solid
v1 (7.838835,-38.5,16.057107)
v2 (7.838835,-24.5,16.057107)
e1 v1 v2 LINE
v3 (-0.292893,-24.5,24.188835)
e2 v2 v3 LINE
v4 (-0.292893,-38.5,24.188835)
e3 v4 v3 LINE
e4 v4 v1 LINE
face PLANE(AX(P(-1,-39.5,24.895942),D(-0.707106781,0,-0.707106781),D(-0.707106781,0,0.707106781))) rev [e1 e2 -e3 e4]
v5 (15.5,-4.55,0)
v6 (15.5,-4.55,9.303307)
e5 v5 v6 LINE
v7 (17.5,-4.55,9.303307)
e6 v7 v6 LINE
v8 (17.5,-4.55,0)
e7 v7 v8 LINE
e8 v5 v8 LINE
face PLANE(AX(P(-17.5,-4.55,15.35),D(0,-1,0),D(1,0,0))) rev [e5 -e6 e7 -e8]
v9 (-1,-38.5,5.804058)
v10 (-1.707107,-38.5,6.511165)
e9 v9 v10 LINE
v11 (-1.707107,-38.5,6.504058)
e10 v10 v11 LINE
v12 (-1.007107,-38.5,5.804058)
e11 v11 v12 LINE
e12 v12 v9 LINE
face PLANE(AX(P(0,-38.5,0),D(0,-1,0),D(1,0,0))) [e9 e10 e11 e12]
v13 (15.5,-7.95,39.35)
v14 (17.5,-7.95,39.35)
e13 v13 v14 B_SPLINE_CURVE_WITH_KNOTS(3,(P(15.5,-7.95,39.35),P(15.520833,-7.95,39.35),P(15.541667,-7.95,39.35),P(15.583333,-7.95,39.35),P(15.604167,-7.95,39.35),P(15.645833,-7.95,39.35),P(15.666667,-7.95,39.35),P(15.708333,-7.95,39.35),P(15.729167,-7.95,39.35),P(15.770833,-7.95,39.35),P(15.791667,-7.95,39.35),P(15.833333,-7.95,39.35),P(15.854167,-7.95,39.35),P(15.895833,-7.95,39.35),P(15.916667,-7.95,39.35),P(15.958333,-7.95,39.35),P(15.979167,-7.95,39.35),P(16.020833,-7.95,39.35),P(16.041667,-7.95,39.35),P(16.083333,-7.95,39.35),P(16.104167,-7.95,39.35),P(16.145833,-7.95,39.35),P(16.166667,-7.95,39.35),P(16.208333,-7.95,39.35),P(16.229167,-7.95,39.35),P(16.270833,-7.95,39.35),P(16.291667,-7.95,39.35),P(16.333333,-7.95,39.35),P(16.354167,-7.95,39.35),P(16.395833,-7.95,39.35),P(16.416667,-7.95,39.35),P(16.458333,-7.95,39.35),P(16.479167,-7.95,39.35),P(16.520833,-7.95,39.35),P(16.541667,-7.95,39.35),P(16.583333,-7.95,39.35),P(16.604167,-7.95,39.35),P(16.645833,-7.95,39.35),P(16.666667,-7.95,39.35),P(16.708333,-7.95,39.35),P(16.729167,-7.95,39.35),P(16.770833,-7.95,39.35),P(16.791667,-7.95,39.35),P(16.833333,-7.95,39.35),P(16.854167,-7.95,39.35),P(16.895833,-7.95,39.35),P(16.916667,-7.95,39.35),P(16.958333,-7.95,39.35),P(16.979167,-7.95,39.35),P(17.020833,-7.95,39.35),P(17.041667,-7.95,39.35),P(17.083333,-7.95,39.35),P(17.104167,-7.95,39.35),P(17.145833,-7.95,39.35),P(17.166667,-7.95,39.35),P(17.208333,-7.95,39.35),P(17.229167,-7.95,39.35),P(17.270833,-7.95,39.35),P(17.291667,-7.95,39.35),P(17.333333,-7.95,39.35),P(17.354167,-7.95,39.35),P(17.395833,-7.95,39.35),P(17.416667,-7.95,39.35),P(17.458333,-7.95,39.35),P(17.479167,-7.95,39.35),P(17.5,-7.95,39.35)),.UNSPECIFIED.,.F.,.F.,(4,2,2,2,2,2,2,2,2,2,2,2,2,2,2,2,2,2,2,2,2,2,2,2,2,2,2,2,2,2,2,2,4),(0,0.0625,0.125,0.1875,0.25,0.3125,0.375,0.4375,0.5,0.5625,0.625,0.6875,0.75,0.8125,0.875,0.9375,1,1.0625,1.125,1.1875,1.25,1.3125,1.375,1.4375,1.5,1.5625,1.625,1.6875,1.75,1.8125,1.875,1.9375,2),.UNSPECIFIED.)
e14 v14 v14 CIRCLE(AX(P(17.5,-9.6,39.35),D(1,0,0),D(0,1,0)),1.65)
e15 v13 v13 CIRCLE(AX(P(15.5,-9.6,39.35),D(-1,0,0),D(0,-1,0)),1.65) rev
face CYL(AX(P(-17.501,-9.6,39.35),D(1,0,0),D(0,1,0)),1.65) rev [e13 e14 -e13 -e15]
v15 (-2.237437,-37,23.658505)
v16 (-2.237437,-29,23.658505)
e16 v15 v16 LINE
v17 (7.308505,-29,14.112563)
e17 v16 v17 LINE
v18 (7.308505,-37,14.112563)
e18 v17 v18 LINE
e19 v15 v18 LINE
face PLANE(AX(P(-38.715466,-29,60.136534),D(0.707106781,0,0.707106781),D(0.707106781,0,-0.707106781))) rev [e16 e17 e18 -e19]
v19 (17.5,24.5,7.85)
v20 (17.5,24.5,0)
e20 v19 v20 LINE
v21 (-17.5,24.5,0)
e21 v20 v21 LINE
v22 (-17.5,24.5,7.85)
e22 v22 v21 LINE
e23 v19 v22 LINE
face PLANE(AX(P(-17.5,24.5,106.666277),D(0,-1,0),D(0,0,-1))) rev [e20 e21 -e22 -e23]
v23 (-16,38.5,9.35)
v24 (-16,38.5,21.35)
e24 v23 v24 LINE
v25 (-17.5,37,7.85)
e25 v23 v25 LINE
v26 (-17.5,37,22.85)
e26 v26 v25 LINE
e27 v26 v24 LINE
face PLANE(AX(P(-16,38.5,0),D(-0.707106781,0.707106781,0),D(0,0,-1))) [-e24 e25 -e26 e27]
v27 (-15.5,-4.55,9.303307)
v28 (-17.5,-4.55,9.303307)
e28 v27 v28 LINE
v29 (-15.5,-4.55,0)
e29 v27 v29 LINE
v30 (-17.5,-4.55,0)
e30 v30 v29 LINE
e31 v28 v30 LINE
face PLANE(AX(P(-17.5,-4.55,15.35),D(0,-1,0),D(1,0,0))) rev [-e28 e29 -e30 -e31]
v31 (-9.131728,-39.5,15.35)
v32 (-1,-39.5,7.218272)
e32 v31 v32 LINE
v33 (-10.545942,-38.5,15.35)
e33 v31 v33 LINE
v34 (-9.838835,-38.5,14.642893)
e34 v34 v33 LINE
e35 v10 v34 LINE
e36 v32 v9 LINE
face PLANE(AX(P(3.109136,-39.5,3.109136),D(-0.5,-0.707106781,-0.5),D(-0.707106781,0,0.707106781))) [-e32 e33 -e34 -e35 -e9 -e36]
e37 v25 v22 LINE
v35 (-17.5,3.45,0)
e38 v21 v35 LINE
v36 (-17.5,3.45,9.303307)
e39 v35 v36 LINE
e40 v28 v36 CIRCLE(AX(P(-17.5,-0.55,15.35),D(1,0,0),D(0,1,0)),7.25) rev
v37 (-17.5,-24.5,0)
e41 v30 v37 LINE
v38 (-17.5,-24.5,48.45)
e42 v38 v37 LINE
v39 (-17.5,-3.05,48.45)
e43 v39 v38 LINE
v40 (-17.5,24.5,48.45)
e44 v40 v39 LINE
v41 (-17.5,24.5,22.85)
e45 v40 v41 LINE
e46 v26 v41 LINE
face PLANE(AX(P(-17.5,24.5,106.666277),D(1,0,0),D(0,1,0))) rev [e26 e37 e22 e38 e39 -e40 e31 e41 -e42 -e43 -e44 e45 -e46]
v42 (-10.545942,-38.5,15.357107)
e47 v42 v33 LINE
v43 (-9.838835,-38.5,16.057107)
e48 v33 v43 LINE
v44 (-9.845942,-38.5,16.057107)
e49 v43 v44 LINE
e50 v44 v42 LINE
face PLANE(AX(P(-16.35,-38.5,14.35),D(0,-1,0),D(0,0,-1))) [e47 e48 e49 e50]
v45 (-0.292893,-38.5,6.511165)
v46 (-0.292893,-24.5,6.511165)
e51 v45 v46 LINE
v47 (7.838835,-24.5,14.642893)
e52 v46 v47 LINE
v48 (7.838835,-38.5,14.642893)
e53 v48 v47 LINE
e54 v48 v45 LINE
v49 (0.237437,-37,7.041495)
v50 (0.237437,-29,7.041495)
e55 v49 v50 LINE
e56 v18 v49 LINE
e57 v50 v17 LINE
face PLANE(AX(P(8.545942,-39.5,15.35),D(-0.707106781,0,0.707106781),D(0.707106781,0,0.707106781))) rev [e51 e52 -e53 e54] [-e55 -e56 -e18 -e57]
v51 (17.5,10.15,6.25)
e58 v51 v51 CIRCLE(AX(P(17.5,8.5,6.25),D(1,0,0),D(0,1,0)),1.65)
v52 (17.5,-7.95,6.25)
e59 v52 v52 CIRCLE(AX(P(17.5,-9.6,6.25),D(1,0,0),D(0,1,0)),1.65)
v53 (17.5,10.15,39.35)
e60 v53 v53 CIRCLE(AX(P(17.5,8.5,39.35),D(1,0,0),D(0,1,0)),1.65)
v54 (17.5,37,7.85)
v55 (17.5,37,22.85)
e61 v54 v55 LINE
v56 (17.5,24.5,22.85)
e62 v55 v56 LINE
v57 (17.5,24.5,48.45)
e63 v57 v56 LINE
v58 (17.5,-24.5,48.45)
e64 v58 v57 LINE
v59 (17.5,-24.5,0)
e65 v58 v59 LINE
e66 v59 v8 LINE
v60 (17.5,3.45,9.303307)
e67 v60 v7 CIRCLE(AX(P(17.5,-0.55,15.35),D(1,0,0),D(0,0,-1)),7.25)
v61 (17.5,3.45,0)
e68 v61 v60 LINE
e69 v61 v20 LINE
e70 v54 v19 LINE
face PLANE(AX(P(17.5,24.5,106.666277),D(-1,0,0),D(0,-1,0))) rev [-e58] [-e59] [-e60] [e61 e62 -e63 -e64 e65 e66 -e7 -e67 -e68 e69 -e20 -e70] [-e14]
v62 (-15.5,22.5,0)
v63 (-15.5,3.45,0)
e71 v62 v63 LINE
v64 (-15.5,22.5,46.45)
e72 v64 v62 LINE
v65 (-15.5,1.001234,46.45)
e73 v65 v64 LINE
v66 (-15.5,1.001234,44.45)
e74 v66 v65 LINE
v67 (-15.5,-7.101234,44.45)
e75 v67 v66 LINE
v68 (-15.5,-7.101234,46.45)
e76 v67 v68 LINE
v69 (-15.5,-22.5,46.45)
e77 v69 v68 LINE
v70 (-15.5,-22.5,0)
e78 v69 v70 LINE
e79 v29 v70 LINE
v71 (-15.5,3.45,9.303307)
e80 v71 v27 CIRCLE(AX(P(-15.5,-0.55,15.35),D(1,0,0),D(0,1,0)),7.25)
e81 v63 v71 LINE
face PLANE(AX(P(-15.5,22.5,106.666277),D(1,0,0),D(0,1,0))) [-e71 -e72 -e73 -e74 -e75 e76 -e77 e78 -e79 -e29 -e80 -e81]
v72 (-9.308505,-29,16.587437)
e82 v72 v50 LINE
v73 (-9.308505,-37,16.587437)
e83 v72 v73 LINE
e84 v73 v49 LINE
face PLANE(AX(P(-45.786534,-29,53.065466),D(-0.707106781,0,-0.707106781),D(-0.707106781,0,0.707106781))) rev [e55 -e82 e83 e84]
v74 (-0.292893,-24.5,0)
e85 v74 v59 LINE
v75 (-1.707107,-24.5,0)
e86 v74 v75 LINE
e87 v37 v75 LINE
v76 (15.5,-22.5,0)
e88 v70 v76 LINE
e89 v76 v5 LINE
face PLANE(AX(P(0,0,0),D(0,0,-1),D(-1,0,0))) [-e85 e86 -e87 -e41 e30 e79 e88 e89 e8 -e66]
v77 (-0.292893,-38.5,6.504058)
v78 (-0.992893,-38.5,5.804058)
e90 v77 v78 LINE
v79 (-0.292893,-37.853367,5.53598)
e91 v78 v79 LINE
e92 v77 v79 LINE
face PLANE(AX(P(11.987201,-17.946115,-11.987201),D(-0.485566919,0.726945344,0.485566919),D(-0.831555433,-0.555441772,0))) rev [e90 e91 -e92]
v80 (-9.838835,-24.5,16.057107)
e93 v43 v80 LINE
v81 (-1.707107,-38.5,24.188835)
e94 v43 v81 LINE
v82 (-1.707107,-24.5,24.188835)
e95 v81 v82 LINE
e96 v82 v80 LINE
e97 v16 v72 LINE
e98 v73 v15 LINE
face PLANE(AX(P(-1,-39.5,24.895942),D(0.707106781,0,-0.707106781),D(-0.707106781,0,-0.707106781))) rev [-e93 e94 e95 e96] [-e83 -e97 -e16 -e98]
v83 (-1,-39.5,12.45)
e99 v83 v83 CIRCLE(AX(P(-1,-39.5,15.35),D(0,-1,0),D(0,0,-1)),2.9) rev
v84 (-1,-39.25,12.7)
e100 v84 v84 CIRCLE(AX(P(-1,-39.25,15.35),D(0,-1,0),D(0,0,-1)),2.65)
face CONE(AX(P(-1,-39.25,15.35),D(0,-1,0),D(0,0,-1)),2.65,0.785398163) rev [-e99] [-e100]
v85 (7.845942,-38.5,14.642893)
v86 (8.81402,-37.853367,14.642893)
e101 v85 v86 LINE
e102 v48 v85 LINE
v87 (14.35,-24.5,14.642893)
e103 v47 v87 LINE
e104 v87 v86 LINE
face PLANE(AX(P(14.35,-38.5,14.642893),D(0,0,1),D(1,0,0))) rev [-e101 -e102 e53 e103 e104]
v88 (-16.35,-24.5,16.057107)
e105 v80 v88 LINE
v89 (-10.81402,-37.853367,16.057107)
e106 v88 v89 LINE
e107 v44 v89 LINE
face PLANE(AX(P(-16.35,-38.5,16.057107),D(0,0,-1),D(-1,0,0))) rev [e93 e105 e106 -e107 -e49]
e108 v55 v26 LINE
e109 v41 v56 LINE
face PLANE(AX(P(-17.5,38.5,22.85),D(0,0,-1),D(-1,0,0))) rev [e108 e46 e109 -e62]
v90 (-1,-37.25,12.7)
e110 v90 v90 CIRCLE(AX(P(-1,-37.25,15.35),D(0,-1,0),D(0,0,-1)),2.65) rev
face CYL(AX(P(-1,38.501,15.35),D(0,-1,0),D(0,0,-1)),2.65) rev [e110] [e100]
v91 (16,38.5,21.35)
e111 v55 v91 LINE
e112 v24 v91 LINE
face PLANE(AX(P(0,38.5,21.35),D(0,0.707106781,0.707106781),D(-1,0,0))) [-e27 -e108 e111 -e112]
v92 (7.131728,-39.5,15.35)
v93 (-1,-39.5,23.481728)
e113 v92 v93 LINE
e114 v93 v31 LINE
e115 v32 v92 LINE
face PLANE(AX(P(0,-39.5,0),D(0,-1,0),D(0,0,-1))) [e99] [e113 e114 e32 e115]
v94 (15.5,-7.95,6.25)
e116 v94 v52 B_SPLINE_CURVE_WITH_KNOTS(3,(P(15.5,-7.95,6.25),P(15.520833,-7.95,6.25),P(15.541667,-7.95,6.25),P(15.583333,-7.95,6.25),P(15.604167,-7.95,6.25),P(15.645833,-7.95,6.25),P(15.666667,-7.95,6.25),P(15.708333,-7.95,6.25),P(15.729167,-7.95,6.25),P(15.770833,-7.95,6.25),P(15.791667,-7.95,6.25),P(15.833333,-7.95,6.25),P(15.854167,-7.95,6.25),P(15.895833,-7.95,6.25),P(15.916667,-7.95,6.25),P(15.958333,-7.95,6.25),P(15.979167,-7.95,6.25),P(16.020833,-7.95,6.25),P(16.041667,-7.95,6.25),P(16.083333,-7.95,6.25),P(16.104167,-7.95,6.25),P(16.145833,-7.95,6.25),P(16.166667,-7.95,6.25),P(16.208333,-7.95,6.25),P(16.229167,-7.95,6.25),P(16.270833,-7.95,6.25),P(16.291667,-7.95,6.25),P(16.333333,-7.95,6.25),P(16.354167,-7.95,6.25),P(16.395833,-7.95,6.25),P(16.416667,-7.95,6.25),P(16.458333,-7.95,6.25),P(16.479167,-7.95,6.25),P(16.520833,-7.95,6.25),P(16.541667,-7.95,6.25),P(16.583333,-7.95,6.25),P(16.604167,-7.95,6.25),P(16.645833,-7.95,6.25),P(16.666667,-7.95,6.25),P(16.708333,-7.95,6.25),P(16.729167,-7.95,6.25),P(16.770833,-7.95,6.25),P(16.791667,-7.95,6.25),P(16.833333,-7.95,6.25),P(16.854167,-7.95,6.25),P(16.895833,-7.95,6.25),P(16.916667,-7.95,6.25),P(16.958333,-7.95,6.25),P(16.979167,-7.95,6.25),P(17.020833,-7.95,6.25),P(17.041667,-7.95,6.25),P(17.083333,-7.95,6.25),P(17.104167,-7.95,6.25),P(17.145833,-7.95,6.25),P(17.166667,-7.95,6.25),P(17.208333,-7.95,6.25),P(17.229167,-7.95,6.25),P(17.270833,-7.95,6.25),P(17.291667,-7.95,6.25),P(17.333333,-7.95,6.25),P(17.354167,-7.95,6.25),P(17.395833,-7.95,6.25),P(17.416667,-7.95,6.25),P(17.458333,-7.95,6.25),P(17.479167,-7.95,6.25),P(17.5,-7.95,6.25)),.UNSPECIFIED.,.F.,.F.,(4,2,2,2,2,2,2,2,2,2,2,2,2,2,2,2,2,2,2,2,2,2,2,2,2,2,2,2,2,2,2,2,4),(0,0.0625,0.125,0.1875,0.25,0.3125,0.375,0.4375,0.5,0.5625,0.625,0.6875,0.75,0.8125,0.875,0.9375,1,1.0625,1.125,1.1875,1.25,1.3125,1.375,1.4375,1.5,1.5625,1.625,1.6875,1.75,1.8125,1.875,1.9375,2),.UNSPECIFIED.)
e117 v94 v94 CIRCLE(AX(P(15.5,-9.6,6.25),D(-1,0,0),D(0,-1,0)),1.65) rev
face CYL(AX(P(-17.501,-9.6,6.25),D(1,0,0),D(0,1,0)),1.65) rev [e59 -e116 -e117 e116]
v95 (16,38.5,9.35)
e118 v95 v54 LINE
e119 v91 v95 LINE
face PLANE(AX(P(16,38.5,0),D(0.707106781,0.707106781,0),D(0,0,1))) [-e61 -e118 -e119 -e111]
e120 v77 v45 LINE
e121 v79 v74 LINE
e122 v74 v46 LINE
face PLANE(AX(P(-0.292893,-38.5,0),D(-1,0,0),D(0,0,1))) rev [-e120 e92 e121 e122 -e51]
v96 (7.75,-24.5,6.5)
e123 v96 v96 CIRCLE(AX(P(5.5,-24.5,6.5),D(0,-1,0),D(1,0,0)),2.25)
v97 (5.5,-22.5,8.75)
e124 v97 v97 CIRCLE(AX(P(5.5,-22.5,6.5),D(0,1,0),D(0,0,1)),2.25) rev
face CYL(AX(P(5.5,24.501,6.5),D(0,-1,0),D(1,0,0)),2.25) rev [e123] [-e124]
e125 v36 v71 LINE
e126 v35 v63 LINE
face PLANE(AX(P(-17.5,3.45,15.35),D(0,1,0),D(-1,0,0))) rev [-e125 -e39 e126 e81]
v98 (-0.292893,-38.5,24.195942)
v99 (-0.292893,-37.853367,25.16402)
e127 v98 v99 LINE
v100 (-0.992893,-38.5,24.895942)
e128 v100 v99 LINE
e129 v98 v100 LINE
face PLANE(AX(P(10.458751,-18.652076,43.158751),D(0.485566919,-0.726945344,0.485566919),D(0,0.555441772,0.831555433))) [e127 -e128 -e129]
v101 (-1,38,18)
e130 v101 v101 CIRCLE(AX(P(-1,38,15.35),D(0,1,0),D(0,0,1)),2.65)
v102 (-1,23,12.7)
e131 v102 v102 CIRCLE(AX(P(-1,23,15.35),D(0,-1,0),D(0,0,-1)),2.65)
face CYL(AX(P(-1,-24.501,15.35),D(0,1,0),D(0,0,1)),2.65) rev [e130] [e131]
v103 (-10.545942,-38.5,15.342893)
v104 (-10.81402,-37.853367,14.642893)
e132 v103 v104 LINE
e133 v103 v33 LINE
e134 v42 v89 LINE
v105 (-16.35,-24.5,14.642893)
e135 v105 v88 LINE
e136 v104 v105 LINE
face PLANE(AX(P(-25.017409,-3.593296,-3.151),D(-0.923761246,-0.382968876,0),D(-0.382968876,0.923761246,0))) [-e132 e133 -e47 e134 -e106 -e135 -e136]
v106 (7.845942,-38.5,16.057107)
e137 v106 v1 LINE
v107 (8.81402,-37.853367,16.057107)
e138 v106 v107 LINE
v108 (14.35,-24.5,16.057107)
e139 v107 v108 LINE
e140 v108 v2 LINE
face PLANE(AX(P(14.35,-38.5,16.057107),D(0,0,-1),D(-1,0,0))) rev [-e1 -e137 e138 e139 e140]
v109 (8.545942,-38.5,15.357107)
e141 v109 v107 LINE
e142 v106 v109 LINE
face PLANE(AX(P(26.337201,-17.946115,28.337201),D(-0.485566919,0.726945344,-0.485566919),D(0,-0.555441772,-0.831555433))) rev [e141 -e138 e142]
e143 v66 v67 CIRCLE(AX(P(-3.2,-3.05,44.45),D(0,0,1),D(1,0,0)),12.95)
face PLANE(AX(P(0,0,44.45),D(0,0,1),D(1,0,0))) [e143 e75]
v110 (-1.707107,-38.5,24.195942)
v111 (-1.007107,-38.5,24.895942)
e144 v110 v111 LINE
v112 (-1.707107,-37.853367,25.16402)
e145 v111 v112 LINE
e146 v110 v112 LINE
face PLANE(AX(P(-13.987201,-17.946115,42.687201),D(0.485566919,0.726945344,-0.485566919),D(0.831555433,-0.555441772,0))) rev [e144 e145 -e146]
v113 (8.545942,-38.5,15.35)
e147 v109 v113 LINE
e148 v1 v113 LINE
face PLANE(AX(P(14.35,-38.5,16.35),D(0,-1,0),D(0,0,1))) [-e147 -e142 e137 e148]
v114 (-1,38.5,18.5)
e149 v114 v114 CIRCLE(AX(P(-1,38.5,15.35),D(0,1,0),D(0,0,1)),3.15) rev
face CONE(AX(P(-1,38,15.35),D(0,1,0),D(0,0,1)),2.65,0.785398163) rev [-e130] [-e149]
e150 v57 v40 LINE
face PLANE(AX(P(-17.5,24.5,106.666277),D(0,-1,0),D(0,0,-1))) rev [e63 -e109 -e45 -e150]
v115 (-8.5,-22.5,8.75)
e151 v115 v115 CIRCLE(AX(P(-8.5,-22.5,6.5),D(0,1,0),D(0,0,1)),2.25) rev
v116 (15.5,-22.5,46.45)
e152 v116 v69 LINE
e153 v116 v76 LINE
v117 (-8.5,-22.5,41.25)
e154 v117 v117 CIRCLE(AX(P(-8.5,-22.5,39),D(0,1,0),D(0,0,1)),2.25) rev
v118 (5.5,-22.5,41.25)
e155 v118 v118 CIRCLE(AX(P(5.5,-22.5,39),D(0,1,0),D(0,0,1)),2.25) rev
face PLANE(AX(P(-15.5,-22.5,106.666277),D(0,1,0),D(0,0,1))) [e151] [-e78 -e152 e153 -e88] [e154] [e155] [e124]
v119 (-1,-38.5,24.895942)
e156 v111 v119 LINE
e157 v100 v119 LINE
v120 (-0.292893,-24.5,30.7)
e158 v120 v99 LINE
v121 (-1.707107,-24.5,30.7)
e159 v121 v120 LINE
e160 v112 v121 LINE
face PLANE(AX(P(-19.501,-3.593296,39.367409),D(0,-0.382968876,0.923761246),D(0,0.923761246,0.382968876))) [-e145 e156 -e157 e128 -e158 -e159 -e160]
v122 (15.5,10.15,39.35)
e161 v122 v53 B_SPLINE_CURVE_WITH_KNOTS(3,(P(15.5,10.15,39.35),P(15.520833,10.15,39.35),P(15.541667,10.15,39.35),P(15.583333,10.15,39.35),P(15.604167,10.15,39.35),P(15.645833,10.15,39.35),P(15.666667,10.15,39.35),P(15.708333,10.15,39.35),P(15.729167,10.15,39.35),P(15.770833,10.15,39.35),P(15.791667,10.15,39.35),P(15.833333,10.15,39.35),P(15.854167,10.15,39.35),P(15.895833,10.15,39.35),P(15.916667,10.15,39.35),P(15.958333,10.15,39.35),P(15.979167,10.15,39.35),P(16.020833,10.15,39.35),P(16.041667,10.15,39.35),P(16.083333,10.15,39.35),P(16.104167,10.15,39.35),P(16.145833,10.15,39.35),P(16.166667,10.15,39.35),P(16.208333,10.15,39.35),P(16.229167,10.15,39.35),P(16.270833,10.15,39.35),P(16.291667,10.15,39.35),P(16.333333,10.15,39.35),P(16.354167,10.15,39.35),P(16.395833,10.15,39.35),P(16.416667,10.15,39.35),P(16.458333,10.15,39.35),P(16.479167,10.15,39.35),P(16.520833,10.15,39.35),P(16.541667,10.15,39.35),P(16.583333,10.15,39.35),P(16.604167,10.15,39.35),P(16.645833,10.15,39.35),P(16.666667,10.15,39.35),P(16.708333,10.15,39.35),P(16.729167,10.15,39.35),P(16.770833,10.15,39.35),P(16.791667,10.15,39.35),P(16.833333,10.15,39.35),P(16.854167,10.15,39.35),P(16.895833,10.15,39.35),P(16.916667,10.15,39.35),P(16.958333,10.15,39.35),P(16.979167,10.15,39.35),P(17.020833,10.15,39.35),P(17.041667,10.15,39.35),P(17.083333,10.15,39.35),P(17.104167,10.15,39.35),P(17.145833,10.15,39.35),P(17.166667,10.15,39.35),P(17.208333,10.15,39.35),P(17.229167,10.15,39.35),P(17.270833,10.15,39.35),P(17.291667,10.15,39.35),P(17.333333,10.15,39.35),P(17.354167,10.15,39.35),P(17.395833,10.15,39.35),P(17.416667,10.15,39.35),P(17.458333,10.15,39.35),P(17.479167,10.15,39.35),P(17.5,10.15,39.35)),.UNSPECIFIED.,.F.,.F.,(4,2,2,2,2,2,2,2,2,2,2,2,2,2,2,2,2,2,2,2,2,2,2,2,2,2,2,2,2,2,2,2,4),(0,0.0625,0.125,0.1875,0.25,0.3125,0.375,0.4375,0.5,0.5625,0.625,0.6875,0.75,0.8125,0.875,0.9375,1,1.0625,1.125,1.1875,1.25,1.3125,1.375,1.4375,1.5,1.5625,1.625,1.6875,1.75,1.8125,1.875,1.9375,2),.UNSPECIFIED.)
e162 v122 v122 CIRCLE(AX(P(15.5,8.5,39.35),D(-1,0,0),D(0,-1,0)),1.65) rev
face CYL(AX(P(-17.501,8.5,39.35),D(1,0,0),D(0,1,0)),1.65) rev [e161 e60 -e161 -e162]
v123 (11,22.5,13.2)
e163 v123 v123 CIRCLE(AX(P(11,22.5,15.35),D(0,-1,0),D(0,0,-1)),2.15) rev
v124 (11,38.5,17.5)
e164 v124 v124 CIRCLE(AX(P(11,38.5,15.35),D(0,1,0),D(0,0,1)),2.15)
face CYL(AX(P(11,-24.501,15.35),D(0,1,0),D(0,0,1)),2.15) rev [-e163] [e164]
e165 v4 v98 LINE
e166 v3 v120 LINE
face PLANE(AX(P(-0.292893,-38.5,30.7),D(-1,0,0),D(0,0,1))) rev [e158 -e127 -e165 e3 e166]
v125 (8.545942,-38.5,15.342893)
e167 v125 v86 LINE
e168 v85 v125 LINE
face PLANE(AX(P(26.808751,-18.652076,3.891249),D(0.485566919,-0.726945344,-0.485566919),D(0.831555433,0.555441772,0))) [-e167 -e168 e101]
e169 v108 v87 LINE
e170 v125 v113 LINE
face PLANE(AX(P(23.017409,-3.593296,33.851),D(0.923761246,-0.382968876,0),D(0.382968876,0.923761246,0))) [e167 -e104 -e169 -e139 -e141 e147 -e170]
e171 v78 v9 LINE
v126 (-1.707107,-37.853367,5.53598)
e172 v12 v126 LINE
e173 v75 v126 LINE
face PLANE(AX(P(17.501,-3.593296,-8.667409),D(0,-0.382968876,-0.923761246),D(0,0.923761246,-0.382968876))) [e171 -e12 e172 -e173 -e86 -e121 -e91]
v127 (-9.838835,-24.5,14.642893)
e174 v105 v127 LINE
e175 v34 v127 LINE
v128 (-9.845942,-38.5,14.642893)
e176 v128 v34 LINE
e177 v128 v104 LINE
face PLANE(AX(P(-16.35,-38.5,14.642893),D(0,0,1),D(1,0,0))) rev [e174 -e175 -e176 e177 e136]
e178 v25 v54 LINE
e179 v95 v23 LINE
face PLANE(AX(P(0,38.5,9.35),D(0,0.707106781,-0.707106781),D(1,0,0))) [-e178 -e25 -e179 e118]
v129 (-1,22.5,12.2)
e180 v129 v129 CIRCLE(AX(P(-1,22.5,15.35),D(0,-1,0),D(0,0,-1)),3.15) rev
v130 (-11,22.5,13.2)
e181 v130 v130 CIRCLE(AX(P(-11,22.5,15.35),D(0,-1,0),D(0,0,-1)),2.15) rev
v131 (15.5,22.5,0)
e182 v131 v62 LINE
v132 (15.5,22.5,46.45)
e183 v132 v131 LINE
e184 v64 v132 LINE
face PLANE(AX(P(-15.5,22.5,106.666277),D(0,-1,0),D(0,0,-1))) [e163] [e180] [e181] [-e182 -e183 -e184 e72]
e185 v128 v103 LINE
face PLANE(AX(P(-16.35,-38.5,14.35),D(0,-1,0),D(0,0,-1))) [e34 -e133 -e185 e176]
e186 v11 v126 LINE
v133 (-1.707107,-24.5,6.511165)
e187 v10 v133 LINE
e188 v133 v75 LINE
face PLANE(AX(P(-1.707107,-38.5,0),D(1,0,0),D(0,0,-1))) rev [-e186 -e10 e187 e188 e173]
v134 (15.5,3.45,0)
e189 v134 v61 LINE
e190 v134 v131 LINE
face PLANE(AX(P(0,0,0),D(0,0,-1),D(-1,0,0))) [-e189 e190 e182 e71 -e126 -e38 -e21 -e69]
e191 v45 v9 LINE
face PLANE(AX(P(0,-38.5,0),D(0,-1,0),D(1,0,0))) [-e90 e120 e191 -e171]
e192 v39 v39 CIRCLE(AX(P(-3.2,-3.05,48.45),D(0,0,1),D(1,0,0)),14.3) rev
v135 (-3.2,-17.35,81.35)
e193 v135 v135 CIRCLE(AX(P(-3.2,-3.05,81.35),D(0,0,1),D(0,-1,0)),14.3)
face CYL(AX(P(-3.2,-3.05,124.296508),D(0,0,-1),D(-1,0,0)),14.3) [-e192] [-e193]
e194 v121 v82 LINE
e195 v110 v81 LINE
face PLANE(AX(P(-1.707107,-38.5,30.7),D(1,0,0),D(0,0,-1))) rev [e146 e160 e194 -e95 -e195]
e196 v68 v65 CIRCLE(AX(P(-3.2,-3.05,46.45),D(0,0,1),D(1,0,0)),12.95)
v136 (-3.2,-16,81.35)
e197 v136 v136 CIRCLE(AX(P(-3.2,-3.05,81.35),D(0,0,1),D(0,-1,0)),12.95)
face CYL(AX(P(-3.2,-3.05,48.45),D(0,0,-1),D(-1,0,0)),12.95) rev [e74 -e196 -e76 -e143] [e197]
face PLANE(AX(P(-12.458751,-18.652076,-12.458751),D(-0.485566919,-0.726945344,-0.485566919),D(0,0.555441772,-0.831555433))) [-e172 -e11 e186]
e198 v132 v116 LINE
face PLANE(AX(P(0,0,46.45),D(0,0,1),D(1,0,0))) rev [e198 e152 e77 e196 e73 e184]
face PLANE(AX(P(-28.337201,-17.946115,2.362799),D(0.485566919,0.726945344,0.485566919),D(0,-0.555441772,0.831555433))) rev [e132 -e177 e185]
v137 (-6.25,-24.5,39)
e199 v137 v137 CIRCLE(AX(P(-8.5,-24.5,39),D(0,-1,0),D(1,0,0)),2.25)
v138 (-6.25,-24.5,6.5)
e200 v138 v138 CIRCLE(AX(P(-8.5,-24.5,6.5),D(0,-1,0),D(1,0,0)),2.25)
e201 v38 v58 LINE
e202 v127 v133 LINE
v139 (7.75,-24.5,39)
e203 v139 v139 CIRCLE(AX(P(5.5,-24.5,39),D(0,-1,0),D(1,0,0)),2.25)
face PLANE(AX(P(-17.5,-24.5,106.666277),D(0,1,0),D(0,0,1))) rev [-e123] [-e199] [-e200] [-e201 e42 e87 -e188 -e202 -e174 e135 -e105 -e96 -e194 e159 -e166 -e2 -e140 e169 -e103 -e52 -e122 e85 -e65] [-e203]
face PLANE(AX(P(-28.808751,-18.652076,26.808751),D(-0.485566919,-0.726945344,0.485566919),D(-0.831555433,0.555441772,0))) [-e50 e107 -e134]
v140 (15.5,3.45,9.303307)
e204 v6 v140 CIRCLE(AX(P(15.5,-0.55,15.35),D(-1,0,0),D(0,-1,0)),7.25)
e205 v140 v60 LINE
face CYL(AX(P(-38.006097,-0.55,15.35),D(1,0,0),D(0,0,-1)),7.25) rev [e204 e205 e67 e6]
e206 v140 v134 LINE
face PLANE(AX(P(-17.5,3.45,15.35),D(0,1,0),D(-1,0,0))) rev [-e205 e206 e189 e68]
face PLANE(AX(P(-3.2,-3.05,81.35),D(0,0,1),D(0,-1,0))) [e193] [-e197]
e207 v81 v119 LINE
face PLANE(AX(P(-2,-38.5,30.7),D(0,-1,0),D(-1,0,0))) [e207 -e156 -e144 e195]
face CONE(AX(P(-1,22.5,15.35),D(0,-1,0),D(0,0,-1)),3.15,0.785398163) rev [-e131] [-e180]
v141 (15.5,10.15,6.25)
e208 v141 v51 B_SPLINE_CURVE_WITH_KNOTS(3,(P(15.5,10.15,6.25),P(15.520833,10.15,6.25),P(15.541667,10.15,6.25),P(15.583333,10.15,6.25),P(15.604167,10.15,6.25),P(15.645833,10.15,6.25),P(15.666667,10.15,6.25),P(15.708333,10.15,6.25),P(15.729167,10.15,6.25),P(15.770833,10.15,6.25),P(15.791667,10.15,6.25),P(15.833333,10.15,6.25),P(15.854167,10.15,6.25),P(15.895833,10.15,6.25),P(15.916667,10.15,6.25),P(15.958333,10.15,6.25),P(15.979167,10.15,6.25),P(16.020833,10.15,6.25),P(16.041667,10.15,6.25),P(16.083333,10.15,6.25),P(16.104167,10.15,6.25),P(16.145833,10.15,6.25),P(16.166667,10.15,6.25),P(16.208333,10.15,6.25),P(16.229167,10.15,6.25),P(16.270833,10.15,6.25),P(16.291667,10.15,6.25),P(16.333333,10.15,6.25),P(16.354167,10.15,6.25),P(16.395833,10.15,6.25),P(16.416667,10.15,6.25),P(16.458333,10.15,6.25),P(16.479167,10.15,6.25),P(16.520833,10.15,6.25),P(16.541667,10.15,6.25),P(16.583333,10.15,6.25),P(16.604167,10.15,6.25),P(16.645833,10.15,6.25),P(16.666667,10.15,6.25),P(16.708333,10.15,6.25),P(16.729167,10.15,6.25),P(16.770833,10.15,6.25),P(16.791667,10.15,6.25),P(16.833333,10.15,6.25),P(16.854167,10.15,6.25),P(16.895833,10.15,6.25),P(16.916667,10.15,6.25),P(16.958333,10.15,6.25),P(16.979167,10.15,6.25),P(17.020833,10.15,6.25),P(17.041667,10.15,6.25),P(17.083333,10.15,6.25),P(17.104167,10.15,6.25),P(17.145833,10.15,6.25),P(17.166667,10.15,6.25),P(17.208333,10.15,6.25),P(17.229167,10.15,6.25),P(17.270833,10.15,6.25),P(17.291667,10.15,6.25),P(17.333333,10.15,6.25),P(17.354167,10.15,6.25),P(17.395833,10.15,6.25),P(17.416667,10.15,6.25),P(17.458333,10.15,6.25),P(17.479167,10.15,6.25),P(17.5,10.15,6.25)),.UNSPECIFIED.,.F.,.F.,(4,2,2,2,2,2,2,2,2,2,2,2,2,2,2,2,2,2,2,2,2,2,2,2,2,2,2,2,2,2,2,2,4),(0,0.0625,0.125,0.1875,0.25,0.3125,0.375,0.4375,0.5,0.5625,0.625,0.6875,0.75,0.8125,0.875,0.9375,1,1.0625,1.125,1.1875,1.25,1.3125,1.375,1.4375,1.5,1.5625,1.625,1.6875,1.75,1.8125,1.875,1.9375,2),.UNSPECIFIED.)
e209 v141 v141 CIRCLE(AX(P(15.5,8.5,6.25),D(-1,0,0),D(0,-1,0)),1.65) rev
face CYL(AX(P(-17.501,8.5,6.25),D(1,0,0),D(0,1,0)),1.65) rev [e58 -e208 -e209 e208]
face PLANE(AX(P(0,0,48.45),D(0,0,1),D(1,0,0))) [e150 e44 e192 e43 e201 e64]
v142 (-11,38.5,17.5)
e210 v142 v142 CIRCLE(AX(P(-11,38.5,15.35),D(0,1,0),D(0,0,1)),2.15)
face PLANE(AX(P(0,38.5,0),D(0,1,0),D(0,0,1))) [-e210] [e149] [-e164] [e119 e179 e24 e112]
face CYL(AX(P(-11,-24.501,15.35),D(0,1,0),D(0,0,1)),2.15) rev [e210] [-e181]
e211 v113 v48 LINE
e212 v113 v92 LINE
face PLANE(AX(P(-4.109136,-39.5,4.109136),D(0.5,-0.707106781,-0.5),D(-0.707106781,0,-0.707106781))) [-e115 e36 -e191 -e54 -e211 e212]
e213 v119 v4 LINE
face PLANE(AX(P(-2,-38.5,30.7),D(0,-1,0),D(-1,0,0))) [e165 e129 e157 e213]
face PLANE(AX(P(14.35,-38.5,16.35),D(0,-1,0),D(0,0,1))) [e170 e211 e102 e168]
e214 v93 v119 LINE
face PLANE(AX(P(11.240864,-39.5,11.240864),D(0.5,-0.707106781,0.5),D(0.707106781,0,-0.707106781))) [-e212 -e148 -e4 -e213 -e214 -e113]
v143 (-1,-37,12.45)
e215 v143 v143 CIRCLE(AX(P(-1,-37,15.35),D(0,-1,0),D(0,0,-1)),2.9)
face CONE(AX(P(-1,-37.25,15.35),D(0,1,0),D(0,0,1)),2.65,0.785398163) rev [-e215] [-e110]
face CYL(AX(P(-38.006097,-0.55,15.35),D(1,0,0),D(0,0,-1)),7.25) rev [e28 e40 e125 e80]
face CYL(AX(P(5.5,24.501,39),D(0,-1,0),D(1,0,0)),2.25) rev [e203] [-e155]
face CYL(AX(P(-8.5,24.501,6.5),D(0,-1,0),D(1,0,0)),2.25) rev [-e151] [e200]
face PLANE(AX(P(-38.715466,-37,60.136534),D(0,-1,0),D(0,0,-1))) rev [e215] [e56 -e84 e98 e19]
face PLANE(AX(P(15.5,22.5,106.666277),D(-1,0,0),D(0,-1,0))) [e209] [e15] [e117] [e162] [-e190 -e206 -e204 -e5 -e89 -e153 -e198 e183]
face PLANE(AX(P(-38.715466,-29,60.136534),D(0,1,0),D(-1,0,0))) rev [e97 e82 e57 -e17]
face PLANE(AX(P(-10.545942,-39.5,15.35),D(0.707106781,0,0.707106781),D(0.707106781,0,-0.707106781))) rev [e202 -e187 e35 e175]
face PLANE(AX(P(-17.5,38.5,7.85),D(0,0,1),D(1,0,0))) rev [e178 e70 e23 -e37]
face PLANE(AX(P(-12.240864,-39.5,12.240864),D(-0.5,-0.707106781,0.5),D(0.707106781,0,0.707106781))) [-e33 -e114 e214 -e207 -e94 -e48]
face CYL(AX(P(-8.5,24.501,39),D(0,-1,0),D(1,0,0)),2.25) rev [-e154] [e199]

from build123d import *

# Parameters (mm, degrees)
EXTRUDE_1_DEPTH          = 46.45
CUT_EXTRUDE_2_REACH      = 65.11
SKETCH_2_R               = 7.249999999999959
SKETCH_2_R_2             = 5.749999999999962
CUT_EXTRUDE_3_REACH      = 71.748
SKETCH_3_R               = 2.2500000000000027
SKETCH_3_R_2             = 2.249999999999999
SKETCH_4_R               = 12.949999999999998
EXTRUDE_4_DEPTH          = 2
CUT_EXTRUDE_4_DEPTH      = 2
EXTRUDE_5_DEPTH          = 34.9
EXTRUDE_6_DEPTH          = 14
CUT_EXTRUDE_6_REACH      = 106.37
SKETCH_8_R               = 2.649999999999999
SKETCH_8_R_2             = 2.149999999999999
CHAMFER_1_SIZE           = 0.5
EXTRUDE_7_DEPTH          = 15
CUT_EXTRUDE_7_REACH      = 91.85
CUT_EXTRUDE_8_REACH      = 116.053
SKETCH_11_R              = 2.6499999999999995
CHAMFER_4_SIZE           = 1
EXTRUDE_8_DEPTH          = 14
CUT_EXTRUDE_9_REACH      = 94.45
CHAMFER_START            = 24.687020867
CHAMFER_7_DEPTH          = 0.339896844
CHAMFER_START_2          = -25.99805155
CHAMFER_8_DEPTH          = 0.339896844
CHAMFER_2_SIZE           = 0.25
CHAMFER_3_SIZE           = 1.5
CHAMFER_6_SIZE           = 1
SKETCH_18_W              = 15.350000000000055
SKETCH_18_H              = 7.999999999999998
CUT_EXTRUDE_10_DEPTH     = 97.96944106263581
PATTERN_CIRCULAR_1_COUNT = 4
CUT_EXTRUDE_11_REACH     = 98.969
SKETCH_19_R              = 1.650000000000008
SKETCH_19_R_2            = 1.6500000000000021
SKETCH_19_R_3            = 1.6500000000000006


with BuildPart() as part:
    # 草图1 → 凸台-拉伸1 (new body)
    with BuildSketch(Plane.XY):
        Polygon((17.5, 24.5), (17.500000000000007, -24.5), (-17.499999999999993, -24.5), (-17.499999999999996, 24.5), align=None)
        Polygon((-15.499999999999998, 22.5), (15.500000000000002, 22.5), (15.500000000000009, -22.5), (-15.499999999999995, -22.5), align=None, mode=Mode.SUBTRACT)
    extrude(amount=EXTRUDE_1_DEPTH)

    # 切除-拉伸2: up to this face of the body (flat: up to its plane)
    cut_extrude_2_end = Plane(part.part.faces().sort_by_distance((-17.5, 0, 23.225))[0])
    # 草图2 → 切除-拉伸2 (cut, up to the picked face)
    with BuildSketch(Plane(origin=(17.500000000000004, 2.48e-15, 0), x_dir=(0, 0, -1), z_dir=(1, 0, 0)), mode=Mode.PRIVATE) as cut_extrude_2_sk1:
        with Locations(Location((-15.350000000000003, -0.5500000000000251, 0), (0, 0, 90))):
            Circle(SKETCH_2_R)
        with Locations((-15.350000000000003, -0.5500000000000251)):
            Circle(SKETCH_2_R_2, mode=Mode.SUBTRACT)
    cut_extrude_2_tool1 = split(extrude(cut_extrude_2_sk1.sketch, amount=-CUT_EXTRUDE_2_REACH, mode=Mode.PRIVATE), bisect_by=cut_extrude_2_end, keep=Keep.BOTH, mode=Mode.PRIVATE)
    add(cut_extrude_2_tool1.solids().sort_by(Axis((17.5, -7.594939, 15.35), (-1, 0, 0)))[0], mode=Mode.SUBTRACT)


with BuildPart() as cut_extrude_2_kept_piece:
    # of the separate pieces the step leaves, the one the design keeps (cut_extrude_2_pieces_kept)
    add(part.part.solids().sort_by_distance((17.5, 24.5, 0))[0])

    # 草图3 → 切除-拉伸3 (cut, up to next)
    with BuildSketch(Plane.XZ.offset(24.5), mode=Mode.PRIVATE) as cut_extrude_3_sk1:
        with Locations((-8.500000000000327, 39.00000000000005)):
            Circle(SKETCH_3_R)
    cut_extrude_3_tool1 = extrude(cut_extrude_3_sk1.sketch, amount=-CUT_EXTRUDE_3_REACH, mode=Mode.PRIVATE) & cut_extrude_2_kept_piece.part
    # 草图3 → 切除-拉伸3 (cut, up to next)
    with BuildSketch(Plane.XZ.offset(24.5), mode=Mode.PRIVATE) as cut_extrude_3_sk2:
        with Locations((5.49999999999966, 39.00000000000005)):
            Circle(SKETCH_3_R)
    cut_extrude_3_tool2 = extrude(cut_extrude_3_sk2.sketch, amount=-CUT_EXTRUDE_3_REACH, mode=Mode.PRIVATE) & cut_extrude_2_kept_piece.part
    # 草图3 → 切除-拉伸3 (cut, up to next)
    with BuildSketch(Plane.XZ.offset(24.5), mode=Mode.PRIVATE) as cut_extrude_3_sk3:
        with Locations((-8.500000000000327, 6.500000000000061)):
            Circle(SKETCH_3_R_2)
    cut_extrude_3_tool3 = extrude(cut_extrude_3_sk3.sketch, amount=-CUT_EXTRUDE_3_REACH, mode=Mode.PRIVATE) & cut_extrude_2_kept_piece.part
    # 草图3 → 切除-拉伸3 (cut, up to next)
    with BuildSketch(Plane.XZ.offset(24.5), mode=Mode.PRIVATE) as cut_extrude_3_sk4:
        with Locations((5.49999999999966, 6.500000000000061)):
            Circle(SKETCH_3_R_2)
    cut_extrude_3_tool4 = extrude(cut_extrude_3_sk4.sketch, amount=-CUT_EXTRUDE_3_REACH, mode=Mode.PRIVATE) & cut_extrude_2_kept_piece.part
    add(cut_extrude_3_tool1.solids().sort_by_distance((-8.5, -24.5, 39))[0], mode=Mode.SUBTRACT)
    add(cut_extrude_3_tool2.solids().sort_by_distance((5.5, -24.5, 39))[0], mode=Mode.SUBTRACT)
    add(cut_extrude_3_tool3.solids().sort_by_distance((-8.5, -24.5, 6.5))[0], mode=Mode.SUBTRACT)
    add(cut_extrude_3_tool4.solids().sort_by_distance((5.5, -24.5, 6.5))[0], mode=Mode.SUBTRACT)

    # 草图4 → 凸台-拉伸4 (add)
    with BuildSketch(Plane.XY.offset(46.449999999999996)):
        Polygon((17.5, 24.500000000000018), (-17.5, 24.500000000000018), (-17.499999999999993, -24.499999999999982), (17.500000000000007, -24.499999999999982), align=None)
        with Locations((-3.200000000000329, -3.0499999999999856)):
            Circle(SKETCH_4_R, mode=Mode.SUBTRACT)
    extrude(amount=EXTRUDE_4_DEPTH)

    # 草图4<4> → 切除-拉伸4 (cut)
    with BuildSketch(Plane.XY.offset(46.449999999999996)):
        with BuildLine():
            Line((-15.499999999999995, -7.101234379791393), (-15.499999999999995, 1.0012343797914305))
            ThreePointArc((-15.500000000000153, 1.0012343797914554), (-16.150000000000322, -3.0499999999999834), (-15.500000000000156, -7.1012343797914195))
        make_face()
    extrude(amount=-CUT_EXTRUDE_4_DEPTH, mode=Mode.SUBTRACT)

    # 草图4<5> → 凸台-拉伸5 (add)
    with BuildSketch(Plane.XY.offset(46.449999999999996)):
        with BuildLine():
            ThreePointArc((-15.500000000000401, 4.243833011521833), (-16.990939054320602, 0.7315340802364934), (-17.49999999999914, -3.0500000000000234))
            ThreePointArc((-17.49999999999914, -3.0500000000000234), (-16.990939054320602, -6.831534080236546), (-15.5000000000004, -10.343833011521886))
            Line((-15.499999999999995, -10.343833011521788), (-15.499999999999995, -7.101234379791393))
            ThreePointArc((-15.500000000000156, -7.1012343797914195), (-16.150000000000322, -3.0499999999999834), (-15.500000000000153, 1.0012343797914554))
            Line((-15.499999999999995, 1.0012343797914305), (-15.499999999999995, 4.243833011521733))
        make_face()
        with BuildLine():
            ThreePointArc((11.099999999999373, -3.050000000000025), (0.5815340802366347, 10.740939054320695), (-15.500000000000401, 4.243833011521833))
            Line((-15.499999999999995, 4.243833011521733), (-15.499999999999995, 1.0012343797914305))
            ThreePointArc((-15.500000000000153, 1.0012343797914554), (-10.790751437825861, 7.442044253106728), (-3.2000000000003266, 9.900000000000015))
            ThreePointArc((-3.200000000000332, 9.900000000000013), (9.74999999999967, -3.0499999999999825), (-3.2000000000003297, -15.999999999999982))
            ThreePointArc((-3.200000000000337, -15.99999999999998), (-10.790751437825865, -13.542044253106688), (-15.500000000000156, -7.1012343797914195))
            Line((-15.499999999999995, -7.101234379791393), (-15.499999999999995, -10.343833011521788))
            ThreePointArc((-15.5000000000004, -10.343833011521886), (0.5815340802366369, -16.840939054320746), (11.099999999999373, -3.0500000000000287))
        make_face()
    extrude(amount=EXTRUDE_5_DEPTH)

    # 草图6 → 凸台-拉伸6 (add)
    with BuildSketch(Plane(origin=(0, 24.5, 0), x_dir=(1, 0, 0), z_dir=(0, 1, 0))):
        Polygon((-17.5, -7.850000000000228), (17.500000000000004, -7.850000000000228), (17.500000000000004, -22.85000000000023), (-17.499999999999996, -22.85000000000023), align=None)
    extrude(amount=EXTRUDE_6_DEPTH)

    # 草图8 → 切除-拉伸6 (cut, up to next)
    with BuildSketch(Plane(origin=(0, 38.5, 0), x_dir=(1, 0, 0), z_dir=(0, 1, 0)), mode=Mode.PRIVATE) as cut_extrude_6_sk1:
        with Locations(Location((-0.9999999999999315, -15.350000000000131, 0), (0, 0, 270))):
            Circle(SKETCH_8_R)
    cut_extrude_6_tool1 = extrude(cut_extrude_6_sk1.sketch, amount=-CUT_EXTRUDE_6_REACH, mode=Mode.PRIVATE) & cut_extrude_2_kept_piece.part
    # 草图8 → 切除-拉伸6 (cut, up to next)
    with BuildSketch(Plane(origin=(0, 38.5, 0), x_dir=(1, 0, 0), z_dir=(0, 1, 0)), mode=Mode.PRIVATE) as cut_extrude_6_sk2:
        with Locations(Location((11.00000000000007, -15.350000000000128, 0), (0, 0, 270))):
            Circle(SKETCH_8_R_2)
    cut_extrude_6_tool2 = extrude(cut_extrude_6_sk2.sketch, amount=-CUT_EXTRUDE_6_REACH, mode=Mode.PRIVATE) & cut_extrude_2_kept_piece.part
    # 草图8 → 切除-拉伸6 (cut, up to next)
    with BuildSketch(Plane(origin=(0, 38.5, 0), x_dir=(1, 0, 0), z_dir=(0, 1, 0)), mode=Mode.PRIVATE) as cut_extrude_6_sk3:
        with Locations(Location((-10.999999999999932, -15.350000000000128, 0), (0, 0, 270))):
            Circle(SKETCH_8_R_2)
    cut_extrude_6_tool3 = extrude(cut_extrude_6_sk3.sketch, amount=-CUT_EXTRUDE_6_REACH, mode=Mode.PRIVATE) & cut_extrude_2_kept_piece.part
    add(cut_extrude_6_tool1.solids().sort_by_distance((-1, 38.5, 15.35))[0], mode=Mode.SUBTRACT)
    add(cut_extrude_6_tool2.solids().sort_by_distance((11, 38.5, 15.35))[0], mode=Mode.SUBTRACT)
    add(cut_extrude_6_tool3.solids().sort_by_distance((-11, 38.5, 15.35))[0], mode=Mode.SUBTRACT)

    # 倒角1
    chamfer_1_edges = [cut_extrude_2_kept_piece.edges().sort_by_distance(p)[0] for p in [
        (-0.9999999999999307, 22.5, 12.700000000000133),
        (-0.9999999999999307, 38.5, 12.700000000000133),
    ]]
    chamfer(chamfer_1_edges, length=CHAMFER_1_SIZE)

    # 草图10 → 凸台-拉伸7 (add)
    with BuildSketch(Plane.XZ.offset(24.5)):
        Polygon((-0.9999999999999757, 24.8959415460183), (8.54594154601842, 15.349999999999916), (-0.9999999999999722, 5.804058453981523), (-10.545941546018366, 15.349999999999913), align=None)
    extrude(amount=EXTRUDE_7_DEPTH)

    # 草图12 → 切除-拉伸7 (cut, up to next)
    with BuildSketch(Plane(origin=(-3.4020292269907464, 3.4e-16, 3.402029226990747), x_dir=(-0.7071067811865475, 0, -0.7071067811865476), z_dir=(0.7071067811865476, 0, -0.7071067811865475)), mode=Mode.PRIVATE) as cut_extrude_7_sk1:
        Polygon((-15.14698231002692, -28.999999999999996), (-5.146982310026918, -28.999999999999996), (-5.146982310026917, -37), (-15.146982310026917, -37), align=None)
    cut_extrude_7_tool1 = extrude(cut_extrude_7_sk1.sketch, amount=-CUT_EXTRUDE_7_REACH, mode=Mode.PRIVATE) & cut_extrude_2_kept_piece.part
    add(cut_extrude_7_tool1.solids().sort_by_distance((3.772971, -33, 10.577029))[0], mode=Mode.SUBTRACT)

    # 草图11 → 切除-拉伸8 (cut, up to next)
    with BuildSketch(Plane.XZ.offset(39.5), mode=Mode.PRIVATE) as cut_extrude_8_sk1:
        with Locations(Location((-0.999999999999979, 15.34999999999991, 0), (0, 0, 90))):
            Circle(SKETCH_11_R)
    cut_extrude_8_tool1 = extrude(cut_extrude_8_sk1.sketch, amount=-CUT_EXTRUDE_8_REACH, mode=Mode.PRIVATE) & cut_extrude_2_kept_piece.part
    add(cut_extrude_8_tool1.solids().sort_by_distance((-1, -39.5, 15.35))[0], mode=Mode.SUBTRACT)

    # 倒角4
    chamfer_4_edges = [cut_extrude_2_kept_piece.edges().sort_by_distance(p)[0] for p in [
        (3.7729707730092232, -39.5, 10.57702922699072),
        (-5.772970773009172, -39.5, 20.122970773009108),
        (-5.772970773009171, -39.5, 10.577029226990717),
    ]]
    chamfer(chamfer_4_edges, length=CHAMFER_4_SIZE)

    # 草图13 → 凸台-拉伸8 (add)
    with BuildSketch(Plane.XZ.offset(24.5)):
        Polygon((-1.707106781186491, 0), (-0.2928932188134219, 0), (-0.2928932188134306, 6.511165235168065), (-0.9999999999999722, 5.804058453981523), (-1.707106781186516, 6.5111652351680664), align=None)
    extrude_8 = extrude(amount=EXTRUDE_8_DEPTH)

    # 草图14 → 切除-拉伸9 (cut, up to next)
    with BuildSketch(Plane.ZY.offset(1.7071067811864877), mode=Mode.PRIVATE) as cut_extrude_9_sk1:
        Polygon((5.804058453981532, -38.5), (5.91e-15, -24.5), (5.91e-15, -38.5), align=None)
    cut_extrude_9_tool1 = extrude(cut_extrude_9_sk1.sketch, amount=-CUT_EXTRUDE_9_REACH, mode=Mode.PRIVATE) & cut_extrude_2_kept_piece.part
    cut_extrude_9 = cut_extrude_9_tool1.solids().sort_by_distance((-1.707107, -33.833333, 1.934686))[0]
    add(cut_extrude_9, mode=Mode.SUBTRACT)

    # 倒角7: read off the stored shape, not the designer's step
    # 倒角7 outline → 倒角7 (cut)
    with BuildSketch(Plane(origin=(0, 0, 0), x_dir=(0.8741995005410046, 0.40377580995908047, 0.2697041500343415), z_dir=(0.48556691943938896, -0.7269453442262939, -0.4855669194393879)).offset(CHAMFER_START)):
        Polygon((-14.847976787, 26.210904553), (-14.047244232, 25.62881575), (-14.047244232, 26.792993356), align=None)
    chamfer_7 = extrude(amount=CHAMFER_7_DEPTH, mode=Mode.SUBTRACT)

    # 倒角8: read off the stored shape, not the designer's step
    # 倒角8 outline → 倒角8 (cut)
    with BuildSketch(Plane(origin=(0, 0, 0), x_dir=(0.8741995005410051, -0.4037758099590791, -0.2697041500343421), z_dir=(0.4855669194393881, 0.7269453442262931, 0.48556691943939007)).offset(CHAMFER_START_2)):
        Polygon((12.298845231, -26.792993356), (13.099577786, -26.210904553), (12.298845231, -25.62881575), align=None)
    chamfer_8 = extrude(amount=CHAMFER_8_DEPTH, mode=Mode.SUBTRACT)

    # 倒角2
    chamfer_2_edges = [cut_extrude_2_kept_piece.edges().sort_by_distance(p)[0] for p in [
        (-0.9999999999999784, -37, 12.69999999999991),
        (-0.9999999999999784, -39.5, 12.69999999999991),
    ]]
    chamfer(chamfer_2_edges, length=CHAMFER_2_SIZE)

    # 倒角3
    chamfer_3_edges = [cut_extrude_2_kept_piece.edges().sort_by_distance(p)[0] for p in [
        (17.500000000000004, 38.5, 15.350000000000229),
        (0, 38.5, 7.850000000000228),
        (-17.5, 38.5, 15.350000000000229),
        (3.55e-15, 38.5, 22.85000000000023),
    ]]
    chamfer(chamfer_3_edges, length=CHAMFER_3_SIZE)

    # 倒角6
    chamfer_6_edges = [cut_extrude_2_kept_piece.edges().sort_by_distance(p)[0] for p in [
        (3.772970773009223, -39.5, 20.122970773009108),
    ]]
    chamfer(chamfer_6_edges, length=CHAMFER_6_SIZE)

    # 草图18 → 切除-拉伸10 (cut, through all)
    with BuildSketch(Plane(origin=(17.500000000000004, 2.48e-15, 0), x_dir=(0, 0, -1), z_dir=(1, 1.4e-16, 0))):
        with Locations((-7.675000000000027, -0.5499999999999801)):
            Rectangle(SKETCH_18_W, SKETCH_18_H)
    extrude(amount=-CUT_EXTRUDE_10_DEPTH, mode=Mode.SUBTRACT)

    # 阵列(圆周)1: 凸台-拉伸8, 切除-拉伸9, 倒角7, 倒角8 ×4 about axis
    pattern_circular_1_axis = Axis((-1.000000000000009, 0, 15.349999999999909), (0, 1, 0))
    add([extrude_8.rotate(pattern_circular_1_axis, i * 360 / PATTERN_CIRCULAR_1_COUNT) for i in range(1, PATTERN_CIRCULAR_1_COUNT)])
    add([cut_extrude_9.rotate(pattern_circular_1_axis, i * 360 / PATTERN_CIRCULAR_1_COUNT) for i in range(1, PATTERN_CIRCULAR_1_COUNT)], mode=Mode.SUBTRACT)
    add([chamfer_7.rotate(pattern_circular_1_axis, i * 360 / PATTERN_CIRCULAR_1_COUNT) for i in range(1, PATTERN_CIRCULAR_1_COUNT)], mode=Mode.SUBTRACT)
    add([chamfer_8.rotate(pattern_circular_1_axis, i * 360 / PATTERN_CIRCULAR_1_COUNT) for i in range(1, PATTERN_CIRCULAR_1_COUNT)], mode=Mode.SUBTRACT)

    # 草图19 → 切除-拉伸11 (cut, up to next)
    with BuildSketch(Plane(origin=(17.500000000000004, 2.48e-15, 0), x_dir=(0, 0, -1), z_dir=(1, 1.4e-16, 0)), mode=Mode.PRIVATE) as cut_extrude_11_sk1:
        with Locations(Location((-6.250000000000002, 8.499999999999982, 0), (0, 0, 90))):
            Circle(SKETCH_19_R)
    cut_extrude_11_tool1 = extrude(cut_extrude_11_sk1.sketch, amount=-CUT_EXTRUDE_11_REACH, mode=Mode.PRIVATE) & cut_extrude_2_kept_piece.part
    # 草图19 → 切除-拉伸11 (cut, up to next)
    with BuildSketch(Plane(origin=(17.500000000000004, 2.48e-15, 0), x_dir=(0, 0, -1), z_dir=(1, 1.4e-16, 0)), mode=Mode.PRIVATE) as cut_extrude_11_sk2:
        with Locations(Location((-39.35, 8.49999999999997, 0), (0, 0, 90))):
            Circle(SKETCH_19_R_2)
    cut_extrude_11_tool2 = extrude(cut_extrude_11_sk2.sketch, amount=-CUT_EXTRUDE_11_REACH, mode=Mode.PRIVATE) & cut_extrude_2_kept_piece.part
    # 草图19 → 切除-拉伸11 (cut, up to next)
    with BuildSketch(Plane(origin=(17.500000000000004, 2.48e-15, 0), x_dir=(0, 0, -1), z_dir=(1, 1.4e-16, 0)), mode=Mode.PRIVATE) as cut_extrude_11_sk3:
        with Locations(Location((-39.349999999999994, -9.600000000000032, 0), (0, 0, 90))):
            Circle(SKETCH_19_R_2)
    cut_extrude_11_tool3 = extrude(cut_extrude_11_sk3.sketch, amount=-CUT_EXTRUDE_11_REACH, mode=Mode.PRIVATE) & cut_extrude_2_kept_piece.part
    # 草图19 → 切除-拉伸11 (cut, up to next)
    with BuildSketch(Plane(origin=(17.500000000000004, 2.48e-15, 0), x_dir=(0, 0, -1), z_dir=(1, 1.4e-16, 0)), mode=Mode.PRIVATE) as cut_extrude_11_sk4:
        with Locations(Location((-6.249999999999996, -9.60000000000002, 0), (0, 0, 90))):
            Circle(SKETCH_19_R_3)
    cut_extrude_11_tool4 = extrude(cut_extrude_11_sk4.sketch, amount=-CUT_EXTRUDE_11_REACH, mode=Mode.PRIVATE) & cut_extrude_2_kept_piece.part
    add(cut_extrude_11_tool1.solids().sort_by_distance((17.5, 8.5, 6.25))[0], mode=Mode.SUBTRACT)
    add(cut_extrude_11_tool2.solids().sort_by_distance((17.5, 8.5, 39.35))[0], mode=Mode.SUBTRACT)
    add(cut_extrude_11_tool3.solids().sort_by_distance((17.5, -9.6, 39.35))[0], mode=Mode.SUBTRACT)
    add(cut_extrude_11_tool4.solids().sort_by_distance((17.5, -9.6, 6.25))[0], mode=Mode.SUBTRACT)


solid = cut_extrude_2_kept_piece.part
